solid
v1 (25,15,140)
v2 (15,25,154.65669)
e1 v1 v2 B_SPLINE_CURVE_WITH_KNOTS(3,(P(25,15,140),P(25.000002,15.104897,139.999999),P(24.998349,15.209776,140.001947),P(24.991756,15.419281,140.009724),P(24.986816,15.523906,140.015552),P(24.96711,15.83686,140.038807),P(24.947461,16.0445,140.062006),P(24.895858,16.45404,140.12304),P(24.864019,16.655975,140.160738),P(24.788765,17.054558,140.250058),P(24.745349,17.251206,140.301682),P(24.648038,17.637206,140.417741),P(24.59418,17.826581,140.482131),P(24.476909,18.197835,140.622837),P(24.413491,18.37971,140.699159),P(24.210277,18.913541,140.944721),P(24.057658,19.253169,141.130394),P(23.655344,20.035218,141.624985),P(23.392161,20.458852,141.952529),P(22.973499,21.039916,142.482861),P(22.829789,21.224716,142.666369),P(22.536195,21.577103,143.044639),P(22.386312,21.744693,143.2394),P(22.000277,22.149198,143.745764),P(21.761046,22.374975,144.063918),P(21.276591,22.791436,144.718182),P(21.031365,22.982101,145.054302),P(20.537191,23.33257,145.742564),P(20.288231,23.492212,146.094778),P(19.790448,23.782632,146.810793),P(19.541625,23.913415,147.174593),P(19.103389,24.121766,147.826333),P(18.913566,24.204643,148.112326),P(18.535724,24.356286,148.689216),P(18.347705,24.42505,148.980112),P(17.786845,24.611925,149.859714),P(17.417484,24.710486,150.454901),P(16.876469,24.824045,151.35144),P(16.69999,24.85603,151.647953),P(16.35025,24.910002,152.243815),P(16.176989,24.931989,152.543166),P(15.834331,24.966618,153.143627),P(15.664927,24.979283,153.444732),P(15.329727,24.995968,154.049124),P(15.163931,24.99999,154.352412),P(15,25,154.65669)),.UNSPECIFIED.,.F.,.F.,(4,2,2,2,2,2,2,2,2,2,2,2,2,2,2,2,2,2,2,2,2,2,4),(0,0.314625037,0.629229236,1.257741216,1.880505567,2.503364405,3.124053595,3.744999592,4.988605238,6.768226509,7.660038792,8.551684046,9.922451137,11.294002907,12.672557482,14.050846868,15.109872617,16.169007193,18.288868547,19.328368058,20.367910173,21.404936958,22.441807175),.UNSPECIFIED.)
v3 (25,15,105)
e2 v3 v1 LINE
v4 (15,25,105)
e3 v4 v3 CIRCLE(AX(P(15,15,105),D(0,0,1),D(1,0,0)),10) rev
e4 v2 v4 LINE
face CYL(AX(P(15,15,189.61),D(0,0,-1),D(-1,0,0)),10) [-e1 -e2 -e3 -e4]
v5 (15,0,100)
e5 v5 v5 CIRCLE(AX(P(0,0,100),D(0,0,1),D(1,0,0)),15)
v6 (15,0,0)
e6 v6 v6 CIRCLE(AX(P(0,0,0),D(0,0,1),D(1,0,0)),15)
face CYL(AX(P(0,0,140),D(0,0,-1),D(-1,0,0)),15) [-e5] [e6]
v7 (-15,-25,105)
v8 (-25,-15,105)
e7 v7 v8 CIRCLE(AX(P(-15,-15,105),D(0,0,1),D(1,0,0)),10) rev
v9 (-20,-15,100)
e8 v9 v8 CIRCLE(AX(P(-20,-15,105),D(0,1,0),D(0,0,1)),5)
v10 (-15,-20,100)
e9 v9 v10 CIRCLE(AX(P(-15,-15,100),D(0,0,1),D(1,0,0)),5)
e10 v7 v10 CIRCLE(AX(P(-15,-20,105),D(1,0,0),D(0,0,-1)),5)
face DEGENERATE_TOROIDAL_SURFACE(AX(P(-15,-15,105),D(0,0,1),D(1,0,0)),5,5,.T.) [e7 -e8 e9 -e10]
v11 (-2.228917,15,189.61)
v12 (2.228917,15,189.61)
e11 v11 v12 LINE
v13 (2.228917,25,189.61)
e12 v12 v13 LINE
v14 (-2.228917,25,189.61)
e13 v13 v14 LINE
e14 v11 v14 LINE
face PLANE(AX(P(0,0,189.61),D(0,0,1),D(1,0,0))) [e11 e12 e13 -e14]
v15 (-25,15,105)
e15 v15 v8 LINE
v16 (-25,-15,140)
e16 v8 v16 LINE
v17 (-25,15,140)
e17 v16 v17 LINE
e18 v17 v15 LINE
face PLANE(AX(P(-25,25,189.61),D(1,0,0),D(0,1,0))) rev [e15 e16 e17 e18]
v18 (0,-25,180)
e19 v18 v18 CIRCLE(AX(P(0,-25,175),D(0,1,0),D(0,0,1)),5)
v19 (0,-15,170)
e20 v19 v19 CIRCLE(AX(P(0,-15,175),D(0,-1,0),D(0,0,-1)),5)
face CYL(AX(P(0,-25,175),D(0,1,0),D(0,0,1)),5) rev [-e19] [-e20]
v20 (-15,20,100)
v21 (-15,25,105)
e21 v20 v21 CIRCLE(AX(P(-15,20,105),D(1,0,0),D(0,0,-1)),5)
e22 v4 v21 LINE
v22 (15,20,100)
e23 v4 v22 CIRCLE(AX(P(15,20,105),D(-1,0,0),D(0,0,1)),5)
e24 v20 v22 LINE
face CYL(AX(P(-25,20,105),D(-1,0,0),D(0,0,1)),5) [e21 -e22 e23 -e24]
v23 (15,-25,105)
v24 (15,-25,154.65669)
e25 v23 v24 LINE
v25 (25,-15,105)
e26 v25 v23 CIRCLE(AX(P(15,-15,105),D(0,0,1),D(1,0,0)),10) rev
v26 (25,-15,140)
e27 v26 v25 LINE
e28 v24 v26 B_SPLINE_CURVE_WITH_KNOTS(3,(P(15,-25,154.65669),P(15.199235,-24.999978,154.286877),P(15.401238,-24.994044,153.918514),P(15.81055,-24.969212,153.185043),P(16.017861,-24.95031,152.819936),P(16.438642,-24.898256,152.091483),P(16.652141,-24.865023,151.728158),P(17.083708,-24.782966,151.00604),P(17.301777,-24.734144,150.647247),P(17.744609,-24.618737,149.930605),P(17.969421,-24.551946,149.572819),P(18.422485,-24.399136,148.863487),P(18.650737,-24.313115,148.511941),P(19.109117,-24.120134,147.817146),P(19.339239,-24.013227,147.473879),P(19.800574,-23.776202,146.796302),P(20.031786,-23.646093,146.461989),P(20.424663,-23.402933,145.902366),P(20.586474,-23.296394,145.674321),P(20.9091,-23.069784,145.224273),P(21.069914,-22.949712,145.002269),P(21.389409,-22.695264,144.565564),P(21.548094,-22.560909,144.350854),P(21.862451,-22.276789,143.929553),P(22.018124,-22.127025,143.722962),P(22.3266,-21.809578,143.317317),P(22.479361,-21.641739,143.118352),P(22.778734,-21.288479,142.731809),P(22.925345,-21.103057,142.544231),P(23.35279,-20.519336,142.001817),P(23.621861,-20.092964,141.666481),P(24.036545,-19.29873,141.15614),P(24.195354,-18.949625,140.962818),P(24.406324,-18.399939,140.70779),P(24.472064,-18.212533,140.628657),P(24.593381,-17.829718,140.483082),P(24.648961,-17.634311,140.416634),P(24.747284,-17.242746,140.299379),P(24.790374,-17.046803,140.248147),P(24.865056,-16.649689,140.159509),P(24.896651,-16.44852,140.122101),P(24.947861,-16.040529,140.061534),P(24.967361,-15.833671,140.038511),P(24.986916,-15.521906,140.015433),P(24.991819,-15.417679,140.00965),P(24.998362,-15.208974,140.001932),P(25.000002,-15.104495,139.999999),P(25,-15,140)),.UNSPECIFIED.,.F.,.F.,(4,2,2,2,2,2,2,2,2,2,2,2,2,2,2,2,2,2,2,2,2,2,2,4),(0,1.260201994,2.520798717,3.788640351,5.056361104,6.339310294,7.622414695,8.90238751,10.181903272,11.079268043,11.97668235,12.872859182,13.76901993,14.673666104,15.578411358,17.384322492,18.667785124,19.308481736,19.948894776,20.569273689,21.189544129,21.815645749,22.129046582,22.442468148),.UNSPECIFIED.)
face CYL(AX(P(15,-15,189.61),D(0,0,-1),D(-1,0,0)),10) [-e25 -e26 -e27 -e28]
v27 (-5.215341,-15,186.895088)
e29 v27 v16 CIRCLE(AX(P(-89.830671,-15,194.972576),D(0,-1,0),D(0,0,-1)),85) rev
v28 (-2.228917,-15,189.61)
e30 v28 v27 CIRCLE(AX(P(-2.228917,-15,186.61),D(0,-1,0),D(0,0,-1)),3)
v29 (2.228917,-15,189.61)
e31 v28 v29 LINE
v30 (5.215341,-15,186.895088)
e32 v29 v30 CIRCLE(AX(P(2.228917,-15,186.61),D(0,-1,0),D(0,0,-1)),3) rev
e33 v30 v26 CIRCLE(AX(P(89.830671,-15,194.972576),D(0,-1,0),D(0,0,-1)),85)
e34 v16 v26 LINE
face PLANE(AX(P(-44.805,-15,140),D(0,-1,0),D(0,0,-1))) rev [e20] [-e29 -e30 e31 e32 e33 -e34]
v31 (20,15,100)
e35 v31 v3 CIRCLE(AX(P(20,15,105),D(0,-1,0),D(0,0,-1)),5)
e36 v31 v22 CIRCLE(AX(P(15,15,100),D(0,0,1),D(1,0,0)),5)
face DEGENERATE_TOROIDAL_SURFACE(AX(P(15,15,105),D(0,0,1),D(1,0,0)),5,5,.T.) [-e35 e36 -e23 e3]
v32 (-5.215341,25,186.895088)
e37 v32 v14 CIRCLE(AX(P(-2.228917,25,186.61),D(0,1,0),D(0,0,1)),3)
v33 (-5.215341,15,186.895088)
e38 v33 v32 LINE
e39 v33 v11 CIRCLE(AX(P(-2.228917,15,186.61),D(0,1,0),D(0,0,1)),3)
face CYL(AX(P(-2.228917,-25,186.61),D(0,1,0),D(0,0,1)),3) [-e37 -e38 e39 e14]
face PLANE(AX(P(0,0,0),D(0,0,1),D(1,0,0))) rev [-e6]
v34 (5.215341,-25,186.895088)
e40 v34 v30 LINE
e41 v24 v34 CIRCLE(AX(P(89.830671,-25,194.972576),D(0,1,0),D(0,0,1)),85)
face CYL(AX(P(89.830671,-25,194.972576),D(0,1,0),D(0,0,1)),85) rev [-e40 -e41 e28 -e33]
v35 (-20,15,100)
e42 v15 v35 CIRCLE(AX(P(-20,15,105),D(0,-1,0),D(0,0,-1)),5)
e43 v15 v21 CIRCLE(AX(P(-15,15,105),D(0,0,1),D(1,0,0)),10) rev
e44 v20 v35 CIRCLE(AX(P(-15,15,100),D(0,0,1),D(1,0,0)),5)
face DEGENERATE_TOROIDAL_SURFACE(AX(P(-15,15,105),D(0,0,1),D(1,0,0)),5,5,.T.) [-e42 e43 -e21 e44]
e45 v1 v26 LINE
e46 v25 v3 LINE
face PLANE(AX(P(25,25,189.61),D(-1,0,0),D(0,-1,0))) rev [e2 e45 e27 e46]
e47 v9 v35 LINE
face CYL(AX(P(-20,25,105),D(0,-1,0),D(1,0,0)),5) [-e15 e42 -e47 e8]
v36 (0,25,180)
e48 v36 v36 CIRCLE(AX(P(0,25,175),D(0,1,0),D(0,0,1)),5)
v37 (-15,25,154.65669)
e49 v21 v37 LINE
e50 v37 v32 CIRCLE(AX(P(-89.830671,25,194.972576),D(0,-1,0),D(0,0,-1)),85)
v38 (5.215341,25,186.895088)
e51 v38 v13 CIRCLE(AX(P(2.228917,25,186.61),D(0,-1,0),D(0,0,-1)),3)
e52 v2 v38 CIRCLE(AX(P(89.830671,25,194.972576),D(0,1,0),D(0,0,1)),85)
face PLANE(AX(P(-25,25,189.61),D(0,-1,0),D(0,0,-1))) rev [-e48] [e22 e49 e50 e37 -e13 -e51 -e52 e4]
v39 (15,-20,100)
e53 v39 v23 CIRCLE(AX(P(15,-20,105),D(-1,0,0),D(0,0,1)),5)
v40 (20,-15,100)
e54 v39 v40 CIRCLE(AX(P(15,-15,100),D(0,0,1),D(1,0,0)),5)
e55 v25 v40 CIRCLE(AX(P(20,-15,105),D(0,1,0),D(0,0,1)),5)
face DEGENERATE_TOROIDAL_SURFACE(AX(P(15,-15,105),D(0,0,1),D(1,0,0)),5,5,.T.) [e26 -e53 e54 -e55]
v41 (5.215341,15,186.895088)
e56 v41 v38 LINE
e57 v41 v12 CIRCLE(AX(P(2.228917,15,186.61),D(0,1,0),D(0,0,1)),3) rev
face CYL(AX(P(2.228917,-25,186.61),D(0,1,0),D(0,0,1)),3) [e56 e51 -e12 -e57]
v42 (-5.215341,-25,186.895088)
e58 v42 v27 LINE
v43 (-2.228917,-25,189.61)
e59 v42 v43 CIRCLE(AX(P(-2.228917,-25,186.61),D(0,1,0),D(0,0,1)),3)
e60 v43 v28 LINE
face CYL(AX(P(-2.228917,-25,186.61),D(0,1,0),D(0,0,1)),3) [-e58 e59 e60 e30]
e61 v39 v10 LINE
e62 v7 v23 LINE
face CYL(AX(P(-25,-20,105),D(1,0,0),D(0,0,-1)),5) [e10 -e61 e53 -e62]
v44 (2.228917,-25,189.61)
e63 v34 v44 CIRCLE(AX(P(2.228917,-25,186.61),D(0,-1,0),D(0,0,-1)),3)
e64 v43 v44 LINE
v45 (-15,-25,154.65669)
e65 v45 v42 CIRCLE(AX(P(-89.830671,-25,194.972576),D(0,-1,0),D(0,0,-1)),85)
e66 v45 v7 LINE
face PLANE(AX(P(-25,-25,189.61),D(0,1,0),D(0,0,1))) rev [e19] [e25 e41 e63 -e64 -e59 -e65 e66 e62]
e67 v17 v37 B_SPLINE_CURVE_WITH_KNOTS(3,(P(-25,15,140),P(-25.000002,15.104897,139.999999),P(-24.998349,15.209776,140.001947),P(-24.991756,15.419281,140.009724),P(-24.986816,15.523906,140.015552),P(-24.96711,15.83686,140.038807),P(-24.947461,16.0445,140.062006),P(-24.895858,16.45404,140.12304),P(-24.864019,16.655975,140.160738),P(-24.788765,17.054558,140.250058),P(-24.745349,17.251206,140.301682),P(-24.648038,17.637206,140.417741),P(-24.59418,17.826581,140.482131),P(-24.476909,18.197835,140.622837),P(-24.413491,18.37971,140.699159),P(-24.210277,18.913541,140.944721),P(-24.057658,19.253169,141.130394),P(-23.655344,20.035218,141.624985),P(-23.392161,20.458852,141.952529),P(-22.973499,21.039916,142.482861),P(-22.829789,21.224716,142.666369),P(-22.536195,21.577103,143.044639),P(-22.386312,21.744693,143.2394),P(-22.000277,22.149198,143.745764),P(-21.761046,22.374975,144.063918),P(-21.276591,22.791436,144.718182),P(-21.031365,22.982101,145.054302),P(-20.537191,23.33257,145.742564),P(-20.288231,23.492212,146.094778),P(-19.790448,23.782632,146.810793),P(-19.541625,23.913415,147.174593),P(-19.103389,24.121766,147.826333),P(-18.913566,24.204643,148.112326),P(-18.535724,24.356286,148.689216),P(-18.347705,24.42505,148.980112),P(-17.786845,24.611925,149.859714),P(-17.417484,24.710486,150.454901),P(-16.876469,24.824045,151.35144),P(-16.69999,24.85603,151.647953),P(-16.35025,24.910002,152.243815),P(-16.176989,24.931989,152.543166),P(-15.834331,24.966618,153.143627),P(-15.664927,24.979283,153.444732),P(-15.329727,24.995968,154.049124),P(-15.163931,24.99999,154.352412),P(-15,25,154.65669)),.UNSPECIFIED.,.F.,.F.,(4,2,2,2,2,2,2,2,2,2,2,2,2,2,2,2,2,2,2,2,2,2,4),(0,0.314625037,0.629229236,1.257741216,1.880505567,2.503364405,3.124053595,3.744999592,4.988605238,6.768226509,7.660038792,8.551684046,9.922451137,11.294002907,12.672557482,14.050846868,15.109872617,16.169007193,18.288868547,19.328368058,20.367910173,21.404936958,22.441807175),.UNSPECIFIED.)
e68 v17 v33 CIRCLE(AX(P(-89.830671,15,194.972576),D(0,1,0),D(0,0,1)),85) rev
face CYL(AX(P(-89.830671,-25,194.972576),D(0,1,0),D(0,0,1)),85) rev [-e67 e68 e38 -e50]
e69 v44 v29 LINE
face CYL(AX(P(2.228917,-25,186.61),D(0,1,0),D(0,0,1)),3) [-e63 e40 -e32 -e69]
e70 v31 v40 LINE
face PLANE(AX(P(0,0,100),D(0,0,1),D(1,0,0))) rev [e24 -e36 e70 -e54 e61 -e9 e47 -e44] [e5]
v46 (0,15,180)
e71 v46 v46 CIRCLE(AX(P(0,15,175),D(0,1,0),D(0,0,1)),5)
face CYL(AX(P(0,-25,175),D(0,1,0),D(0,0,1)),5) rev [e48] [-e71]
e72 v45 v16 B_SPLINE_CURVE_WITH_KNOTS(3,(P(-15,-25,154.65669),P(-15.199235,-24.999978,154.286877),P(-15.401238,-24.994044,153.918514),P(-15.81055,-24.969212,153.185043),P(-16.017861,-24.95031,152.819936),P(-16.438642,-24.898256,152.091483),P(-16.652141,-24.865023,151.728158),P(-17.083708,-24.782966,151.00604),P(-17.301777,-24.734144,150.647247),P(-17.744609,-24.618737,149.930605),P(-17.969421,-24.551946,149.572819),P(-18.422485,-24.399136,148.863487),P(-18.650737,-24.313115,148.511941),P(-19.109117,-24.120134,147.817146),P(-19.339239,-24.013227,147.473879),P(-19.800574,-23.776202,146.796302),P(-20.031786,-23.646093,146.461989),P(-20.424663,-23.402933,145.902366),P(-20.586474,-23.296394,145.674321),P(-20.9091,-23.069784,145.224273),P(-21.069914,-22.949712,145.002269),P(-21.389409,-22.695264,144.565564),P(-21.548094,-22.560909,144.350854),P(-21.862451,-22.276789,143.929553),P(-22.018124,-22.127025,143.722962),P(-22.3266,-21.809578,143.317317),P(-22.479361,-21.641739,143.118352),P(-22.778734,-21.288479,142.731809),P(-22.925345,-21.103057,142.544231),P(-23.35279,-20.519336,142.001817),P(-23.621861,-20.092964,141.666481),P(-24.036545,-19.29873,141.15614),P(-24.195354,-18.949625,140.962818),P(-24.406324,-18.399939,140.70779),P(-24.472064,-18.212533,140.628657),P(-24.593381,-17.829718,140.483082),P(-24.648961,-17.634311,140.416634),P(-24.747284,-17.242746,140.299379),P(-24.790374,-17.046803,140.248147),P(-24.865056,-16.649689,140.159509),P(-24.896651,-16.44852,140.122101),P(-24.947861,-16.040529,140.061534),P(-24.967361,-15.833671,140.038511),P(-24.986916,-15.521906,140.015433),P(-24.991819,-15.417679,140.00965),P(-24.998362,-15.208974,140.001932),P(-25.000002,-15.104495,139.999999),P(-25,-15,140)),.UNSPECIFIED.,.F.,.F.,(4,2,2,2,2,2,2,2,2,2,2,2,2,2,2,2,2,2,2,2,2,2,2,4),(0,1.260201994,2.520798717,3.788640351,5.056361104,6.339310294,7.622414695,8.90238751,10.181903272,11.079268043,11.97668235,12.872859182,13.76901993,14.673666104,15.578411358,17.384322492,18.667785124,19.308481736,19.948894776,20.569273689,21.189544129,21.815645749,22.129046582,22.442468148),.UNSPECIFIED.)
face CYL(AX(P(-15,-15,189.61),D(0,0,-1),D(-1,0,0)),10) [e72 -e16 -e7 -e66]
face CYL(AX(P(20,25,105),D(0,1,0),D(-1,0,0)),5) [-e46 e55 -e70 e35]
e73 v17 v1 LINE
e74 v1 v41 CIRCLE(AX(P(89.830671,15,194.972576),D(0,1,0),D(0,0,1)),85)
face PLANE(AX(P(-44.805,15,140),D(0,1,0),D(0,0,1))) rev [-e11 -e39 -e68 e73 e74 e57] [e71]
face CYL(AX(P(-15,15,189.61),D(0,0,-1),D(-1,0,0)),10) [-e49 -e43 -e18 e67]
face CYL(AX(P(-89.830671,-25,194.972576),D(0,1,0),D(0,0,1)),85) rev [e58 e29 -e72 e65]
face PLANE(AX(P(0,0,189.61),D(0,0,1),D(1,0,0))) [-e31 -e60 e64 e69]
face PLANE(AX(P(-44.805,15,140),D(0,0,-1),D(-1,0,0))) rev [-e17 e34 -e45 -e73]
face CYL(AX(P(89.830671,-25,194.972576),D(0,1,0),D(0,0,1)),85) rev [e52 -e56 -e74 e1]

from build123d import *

# Parameters (mm, degrees)
SKETCH2_R               = 15
BOSS_EXTRUDE2_DEPTH     = 140
SKETCH4_W               = 50
SKETCH4_H               = 50
BOSS_EXTRUDE3_DEPTH     = 89.61
FILLET1_R               = 5
FILLET3_R               = 10
SKETCH6_W               = 49.61
SKETCH6_H               = 30
CUT_EXTRUDE1_DEPTH      = 44.805
CUT_EXTRUDE5_DEPTH      = 193.878075737
CUT_EXTRUDE5_DEPTH_BACK = 193.878075737
SKETCH7_R               = 5


with BuildPart() as part:
    # Sketch2 → Boss-Extrude2 (new body)
    with BuildSketch(Plane.XY):
        Circle(SKETCH2_R)
    extrude(amount=BOSS_EXTRUDE2_DEPTH)

    # Sketch4 → Boss-Extrude3 (add)
    with BuildSketch(Plane.XY.offset(100)):
        Rectangle(SKETCH4_W, SKETCH4_H)
    extrude(amount=BOSS_EXTRUDE3_DEPTH)

    # Fillet1
    fillet1_edges = [part.edges().sort_by_distance(p)[0] for p in [
        (25, 0, 100),
        (0, 25, 100),
        (-25, 0, 100),
        (0, -25, 100),
    ]]
    fillet(fillet1_edges, radius=FILLET1_R)

    # Fillet3
    # the kernel refuses this fillet: 10 mm, written as the material it takes off along each edge
    with BuildSketch(Plane(origin=(15, 15, 100), x_dir=(0, 1, 0), z_dir=(-1, 0, 0))) as fillet3_piece_1:
        with BuildLine():
            CenterArc((5, -5), 5, 0, 90)
            Line((10, -5), (10, 0))
            Line((10, 0), (5, 0))
        make_face()
    revolve(axis=Axis((15, 15, 100), (0, 0, -1)), revolution_arc=90, mode=Mode.SUBTRACT)
    with BuildSketch(Plane(origin=(15, -15, 100), x_dir=(1, 0, 0), z_dir=(0, 1, 0))) as fillet3_piece_2:
        with BuildLine():
            CenterArc((5, -5), 5, 0, 90)
            Line((10, -5), (10, 0))
            Line((10, 0), (5, 0))
        make_face()
    revolve(axis=Axis((15, -15, 100), (0, 0, -1)), revolution_arc=90, mode=Mode.SUBTRACT)
    with BuildSketch(Plane(origin=(-15, 15, 100), x_dir=(-1, 0, 0), z_dir=(0, -1, 0))) as fillet3_piece_3:
        with BuildLine():
            CenterArc((5, -5), 5, 0, 90)
            Line((10, -5), (10, 0))
            Line((10, 0), (5, 0))
        make_face()
    revolve(axis=Axis((-15, 15, 100), (0, 0, -1)), revolution_arc=90, mode=Mode.SUBTRACT)
    with BuildSketch(Plane(origin=(-15, -15, 100), x_dir=(0, -1, 0), z_dir=(1, 0, 0))) as fillet3_piece_4:
        with BuildLine():
            CenterArc((5, -5), 5, 0, 90)
            Line((10, -5), (10, 0))
            Line((10, 0), (5, 0))
        make_face()
    revolve(axis=Axis((-15, -15, 100), (0, 0, -1)), revolution_arc=90, mode=Mode.SUBTRACT)
    with BuildSketch(Plane(origin=(25, -25, 100), x_dir=(0, 1, 0), z_dir=(0, 0, 1)), Plane(origin=(-25, -25, 100), x_dir=(1, 0, 0), z_dir=(0, 0, 1))) as fillet3_piece_5:
        with BuildLine():
            CenterArc((FILLET3_R, FILLET3_R), FILLET3_R, 180, 90)
            Line((0, FILLET3_R), (0, 0))
            Line((0, 0), (FILLET3_R, 0))
        make_face()
    extrude(amount=114.61, mode=Mode.SUBTRACT)
    with BuildSketch(Plane(origin=(25, 25, 100), x_dir=(0, -1, 0), z_dir=(0, 0, 1)), Plane(origin=(-25, 25, 100), x_dir=(1, 0, 0), z_dir=(0, 0, 1))) as fillet3_piece_6:
        with BuildLine():
            CenterArc((FILLET3_R, -FILLET3_R), FILLET3_R, 90, 90)
            Line((0, -FILLET3_R), (0, 0))
            Line((0, 0), (FILLET3_R, 0))
        make_face()
    extrude(amount=114.61, mode=Mode.SUBTRACT)

    # Sketch6 → Cut-Extrude1 (cut, symmetric)
    with BuildSketch(Plane(origin=(0, 0, 0), x_dir=(0, 0, -1), z_dir=(1, 0, 0))):
        with Locations((-164.805, 0)):
            Rectangle(SKETCH6_W, SKETCH6_H)
    extrude(amount=CUT_EXTRUDE1_DEPTH, both=True, mode=Mode.SUBTRACT)

    # Sketch7 → Cut-Extrude5 (cut, two sides: drawn at the far end of the back side and taken through both)
    with BuildSketch(Plane(origin=(0, 0, 0), x_dir=(1, 0, 0), z_dir=(0, 1, 0)).offset(-CUT_EXTRUDE5_DEPTH_BACK)):
        with Locations(Location((0, -175, 0), (0, 0, 270))):
            Circle(SKETCH7_R)
        with BuildLine():
            Line((-2.228917094, -189.61), (2.228917094, -189.61))
            ThreePointArc((2.228917094, -189.61), (4.246928068, -188.829826954), (5.21534053, -186.895087804))
            ThreePointArc((5.21534053, -186.895087804), (11.515192631, -161.931906551), (25, -140))
            ThreePointArc((25, -140), (0, -208.138826335), (-25, -140))
            ThreePointArc((-25, -140), (-11.515192631, -161.931906551), (-5.21534053, -186.895087804))
            ThreePointArc((-5.21534053, -186.895087804), (-4.246928068, -188.829826954), (-2.228917094, -189.61))
        make_face()
    extrude(amount=CUT_EXTRUDE5_DEPTH + CUT_EXTRUDE5_DEPTH_BACK, mode=Mode.SUBTRACT)


solid = part.part
